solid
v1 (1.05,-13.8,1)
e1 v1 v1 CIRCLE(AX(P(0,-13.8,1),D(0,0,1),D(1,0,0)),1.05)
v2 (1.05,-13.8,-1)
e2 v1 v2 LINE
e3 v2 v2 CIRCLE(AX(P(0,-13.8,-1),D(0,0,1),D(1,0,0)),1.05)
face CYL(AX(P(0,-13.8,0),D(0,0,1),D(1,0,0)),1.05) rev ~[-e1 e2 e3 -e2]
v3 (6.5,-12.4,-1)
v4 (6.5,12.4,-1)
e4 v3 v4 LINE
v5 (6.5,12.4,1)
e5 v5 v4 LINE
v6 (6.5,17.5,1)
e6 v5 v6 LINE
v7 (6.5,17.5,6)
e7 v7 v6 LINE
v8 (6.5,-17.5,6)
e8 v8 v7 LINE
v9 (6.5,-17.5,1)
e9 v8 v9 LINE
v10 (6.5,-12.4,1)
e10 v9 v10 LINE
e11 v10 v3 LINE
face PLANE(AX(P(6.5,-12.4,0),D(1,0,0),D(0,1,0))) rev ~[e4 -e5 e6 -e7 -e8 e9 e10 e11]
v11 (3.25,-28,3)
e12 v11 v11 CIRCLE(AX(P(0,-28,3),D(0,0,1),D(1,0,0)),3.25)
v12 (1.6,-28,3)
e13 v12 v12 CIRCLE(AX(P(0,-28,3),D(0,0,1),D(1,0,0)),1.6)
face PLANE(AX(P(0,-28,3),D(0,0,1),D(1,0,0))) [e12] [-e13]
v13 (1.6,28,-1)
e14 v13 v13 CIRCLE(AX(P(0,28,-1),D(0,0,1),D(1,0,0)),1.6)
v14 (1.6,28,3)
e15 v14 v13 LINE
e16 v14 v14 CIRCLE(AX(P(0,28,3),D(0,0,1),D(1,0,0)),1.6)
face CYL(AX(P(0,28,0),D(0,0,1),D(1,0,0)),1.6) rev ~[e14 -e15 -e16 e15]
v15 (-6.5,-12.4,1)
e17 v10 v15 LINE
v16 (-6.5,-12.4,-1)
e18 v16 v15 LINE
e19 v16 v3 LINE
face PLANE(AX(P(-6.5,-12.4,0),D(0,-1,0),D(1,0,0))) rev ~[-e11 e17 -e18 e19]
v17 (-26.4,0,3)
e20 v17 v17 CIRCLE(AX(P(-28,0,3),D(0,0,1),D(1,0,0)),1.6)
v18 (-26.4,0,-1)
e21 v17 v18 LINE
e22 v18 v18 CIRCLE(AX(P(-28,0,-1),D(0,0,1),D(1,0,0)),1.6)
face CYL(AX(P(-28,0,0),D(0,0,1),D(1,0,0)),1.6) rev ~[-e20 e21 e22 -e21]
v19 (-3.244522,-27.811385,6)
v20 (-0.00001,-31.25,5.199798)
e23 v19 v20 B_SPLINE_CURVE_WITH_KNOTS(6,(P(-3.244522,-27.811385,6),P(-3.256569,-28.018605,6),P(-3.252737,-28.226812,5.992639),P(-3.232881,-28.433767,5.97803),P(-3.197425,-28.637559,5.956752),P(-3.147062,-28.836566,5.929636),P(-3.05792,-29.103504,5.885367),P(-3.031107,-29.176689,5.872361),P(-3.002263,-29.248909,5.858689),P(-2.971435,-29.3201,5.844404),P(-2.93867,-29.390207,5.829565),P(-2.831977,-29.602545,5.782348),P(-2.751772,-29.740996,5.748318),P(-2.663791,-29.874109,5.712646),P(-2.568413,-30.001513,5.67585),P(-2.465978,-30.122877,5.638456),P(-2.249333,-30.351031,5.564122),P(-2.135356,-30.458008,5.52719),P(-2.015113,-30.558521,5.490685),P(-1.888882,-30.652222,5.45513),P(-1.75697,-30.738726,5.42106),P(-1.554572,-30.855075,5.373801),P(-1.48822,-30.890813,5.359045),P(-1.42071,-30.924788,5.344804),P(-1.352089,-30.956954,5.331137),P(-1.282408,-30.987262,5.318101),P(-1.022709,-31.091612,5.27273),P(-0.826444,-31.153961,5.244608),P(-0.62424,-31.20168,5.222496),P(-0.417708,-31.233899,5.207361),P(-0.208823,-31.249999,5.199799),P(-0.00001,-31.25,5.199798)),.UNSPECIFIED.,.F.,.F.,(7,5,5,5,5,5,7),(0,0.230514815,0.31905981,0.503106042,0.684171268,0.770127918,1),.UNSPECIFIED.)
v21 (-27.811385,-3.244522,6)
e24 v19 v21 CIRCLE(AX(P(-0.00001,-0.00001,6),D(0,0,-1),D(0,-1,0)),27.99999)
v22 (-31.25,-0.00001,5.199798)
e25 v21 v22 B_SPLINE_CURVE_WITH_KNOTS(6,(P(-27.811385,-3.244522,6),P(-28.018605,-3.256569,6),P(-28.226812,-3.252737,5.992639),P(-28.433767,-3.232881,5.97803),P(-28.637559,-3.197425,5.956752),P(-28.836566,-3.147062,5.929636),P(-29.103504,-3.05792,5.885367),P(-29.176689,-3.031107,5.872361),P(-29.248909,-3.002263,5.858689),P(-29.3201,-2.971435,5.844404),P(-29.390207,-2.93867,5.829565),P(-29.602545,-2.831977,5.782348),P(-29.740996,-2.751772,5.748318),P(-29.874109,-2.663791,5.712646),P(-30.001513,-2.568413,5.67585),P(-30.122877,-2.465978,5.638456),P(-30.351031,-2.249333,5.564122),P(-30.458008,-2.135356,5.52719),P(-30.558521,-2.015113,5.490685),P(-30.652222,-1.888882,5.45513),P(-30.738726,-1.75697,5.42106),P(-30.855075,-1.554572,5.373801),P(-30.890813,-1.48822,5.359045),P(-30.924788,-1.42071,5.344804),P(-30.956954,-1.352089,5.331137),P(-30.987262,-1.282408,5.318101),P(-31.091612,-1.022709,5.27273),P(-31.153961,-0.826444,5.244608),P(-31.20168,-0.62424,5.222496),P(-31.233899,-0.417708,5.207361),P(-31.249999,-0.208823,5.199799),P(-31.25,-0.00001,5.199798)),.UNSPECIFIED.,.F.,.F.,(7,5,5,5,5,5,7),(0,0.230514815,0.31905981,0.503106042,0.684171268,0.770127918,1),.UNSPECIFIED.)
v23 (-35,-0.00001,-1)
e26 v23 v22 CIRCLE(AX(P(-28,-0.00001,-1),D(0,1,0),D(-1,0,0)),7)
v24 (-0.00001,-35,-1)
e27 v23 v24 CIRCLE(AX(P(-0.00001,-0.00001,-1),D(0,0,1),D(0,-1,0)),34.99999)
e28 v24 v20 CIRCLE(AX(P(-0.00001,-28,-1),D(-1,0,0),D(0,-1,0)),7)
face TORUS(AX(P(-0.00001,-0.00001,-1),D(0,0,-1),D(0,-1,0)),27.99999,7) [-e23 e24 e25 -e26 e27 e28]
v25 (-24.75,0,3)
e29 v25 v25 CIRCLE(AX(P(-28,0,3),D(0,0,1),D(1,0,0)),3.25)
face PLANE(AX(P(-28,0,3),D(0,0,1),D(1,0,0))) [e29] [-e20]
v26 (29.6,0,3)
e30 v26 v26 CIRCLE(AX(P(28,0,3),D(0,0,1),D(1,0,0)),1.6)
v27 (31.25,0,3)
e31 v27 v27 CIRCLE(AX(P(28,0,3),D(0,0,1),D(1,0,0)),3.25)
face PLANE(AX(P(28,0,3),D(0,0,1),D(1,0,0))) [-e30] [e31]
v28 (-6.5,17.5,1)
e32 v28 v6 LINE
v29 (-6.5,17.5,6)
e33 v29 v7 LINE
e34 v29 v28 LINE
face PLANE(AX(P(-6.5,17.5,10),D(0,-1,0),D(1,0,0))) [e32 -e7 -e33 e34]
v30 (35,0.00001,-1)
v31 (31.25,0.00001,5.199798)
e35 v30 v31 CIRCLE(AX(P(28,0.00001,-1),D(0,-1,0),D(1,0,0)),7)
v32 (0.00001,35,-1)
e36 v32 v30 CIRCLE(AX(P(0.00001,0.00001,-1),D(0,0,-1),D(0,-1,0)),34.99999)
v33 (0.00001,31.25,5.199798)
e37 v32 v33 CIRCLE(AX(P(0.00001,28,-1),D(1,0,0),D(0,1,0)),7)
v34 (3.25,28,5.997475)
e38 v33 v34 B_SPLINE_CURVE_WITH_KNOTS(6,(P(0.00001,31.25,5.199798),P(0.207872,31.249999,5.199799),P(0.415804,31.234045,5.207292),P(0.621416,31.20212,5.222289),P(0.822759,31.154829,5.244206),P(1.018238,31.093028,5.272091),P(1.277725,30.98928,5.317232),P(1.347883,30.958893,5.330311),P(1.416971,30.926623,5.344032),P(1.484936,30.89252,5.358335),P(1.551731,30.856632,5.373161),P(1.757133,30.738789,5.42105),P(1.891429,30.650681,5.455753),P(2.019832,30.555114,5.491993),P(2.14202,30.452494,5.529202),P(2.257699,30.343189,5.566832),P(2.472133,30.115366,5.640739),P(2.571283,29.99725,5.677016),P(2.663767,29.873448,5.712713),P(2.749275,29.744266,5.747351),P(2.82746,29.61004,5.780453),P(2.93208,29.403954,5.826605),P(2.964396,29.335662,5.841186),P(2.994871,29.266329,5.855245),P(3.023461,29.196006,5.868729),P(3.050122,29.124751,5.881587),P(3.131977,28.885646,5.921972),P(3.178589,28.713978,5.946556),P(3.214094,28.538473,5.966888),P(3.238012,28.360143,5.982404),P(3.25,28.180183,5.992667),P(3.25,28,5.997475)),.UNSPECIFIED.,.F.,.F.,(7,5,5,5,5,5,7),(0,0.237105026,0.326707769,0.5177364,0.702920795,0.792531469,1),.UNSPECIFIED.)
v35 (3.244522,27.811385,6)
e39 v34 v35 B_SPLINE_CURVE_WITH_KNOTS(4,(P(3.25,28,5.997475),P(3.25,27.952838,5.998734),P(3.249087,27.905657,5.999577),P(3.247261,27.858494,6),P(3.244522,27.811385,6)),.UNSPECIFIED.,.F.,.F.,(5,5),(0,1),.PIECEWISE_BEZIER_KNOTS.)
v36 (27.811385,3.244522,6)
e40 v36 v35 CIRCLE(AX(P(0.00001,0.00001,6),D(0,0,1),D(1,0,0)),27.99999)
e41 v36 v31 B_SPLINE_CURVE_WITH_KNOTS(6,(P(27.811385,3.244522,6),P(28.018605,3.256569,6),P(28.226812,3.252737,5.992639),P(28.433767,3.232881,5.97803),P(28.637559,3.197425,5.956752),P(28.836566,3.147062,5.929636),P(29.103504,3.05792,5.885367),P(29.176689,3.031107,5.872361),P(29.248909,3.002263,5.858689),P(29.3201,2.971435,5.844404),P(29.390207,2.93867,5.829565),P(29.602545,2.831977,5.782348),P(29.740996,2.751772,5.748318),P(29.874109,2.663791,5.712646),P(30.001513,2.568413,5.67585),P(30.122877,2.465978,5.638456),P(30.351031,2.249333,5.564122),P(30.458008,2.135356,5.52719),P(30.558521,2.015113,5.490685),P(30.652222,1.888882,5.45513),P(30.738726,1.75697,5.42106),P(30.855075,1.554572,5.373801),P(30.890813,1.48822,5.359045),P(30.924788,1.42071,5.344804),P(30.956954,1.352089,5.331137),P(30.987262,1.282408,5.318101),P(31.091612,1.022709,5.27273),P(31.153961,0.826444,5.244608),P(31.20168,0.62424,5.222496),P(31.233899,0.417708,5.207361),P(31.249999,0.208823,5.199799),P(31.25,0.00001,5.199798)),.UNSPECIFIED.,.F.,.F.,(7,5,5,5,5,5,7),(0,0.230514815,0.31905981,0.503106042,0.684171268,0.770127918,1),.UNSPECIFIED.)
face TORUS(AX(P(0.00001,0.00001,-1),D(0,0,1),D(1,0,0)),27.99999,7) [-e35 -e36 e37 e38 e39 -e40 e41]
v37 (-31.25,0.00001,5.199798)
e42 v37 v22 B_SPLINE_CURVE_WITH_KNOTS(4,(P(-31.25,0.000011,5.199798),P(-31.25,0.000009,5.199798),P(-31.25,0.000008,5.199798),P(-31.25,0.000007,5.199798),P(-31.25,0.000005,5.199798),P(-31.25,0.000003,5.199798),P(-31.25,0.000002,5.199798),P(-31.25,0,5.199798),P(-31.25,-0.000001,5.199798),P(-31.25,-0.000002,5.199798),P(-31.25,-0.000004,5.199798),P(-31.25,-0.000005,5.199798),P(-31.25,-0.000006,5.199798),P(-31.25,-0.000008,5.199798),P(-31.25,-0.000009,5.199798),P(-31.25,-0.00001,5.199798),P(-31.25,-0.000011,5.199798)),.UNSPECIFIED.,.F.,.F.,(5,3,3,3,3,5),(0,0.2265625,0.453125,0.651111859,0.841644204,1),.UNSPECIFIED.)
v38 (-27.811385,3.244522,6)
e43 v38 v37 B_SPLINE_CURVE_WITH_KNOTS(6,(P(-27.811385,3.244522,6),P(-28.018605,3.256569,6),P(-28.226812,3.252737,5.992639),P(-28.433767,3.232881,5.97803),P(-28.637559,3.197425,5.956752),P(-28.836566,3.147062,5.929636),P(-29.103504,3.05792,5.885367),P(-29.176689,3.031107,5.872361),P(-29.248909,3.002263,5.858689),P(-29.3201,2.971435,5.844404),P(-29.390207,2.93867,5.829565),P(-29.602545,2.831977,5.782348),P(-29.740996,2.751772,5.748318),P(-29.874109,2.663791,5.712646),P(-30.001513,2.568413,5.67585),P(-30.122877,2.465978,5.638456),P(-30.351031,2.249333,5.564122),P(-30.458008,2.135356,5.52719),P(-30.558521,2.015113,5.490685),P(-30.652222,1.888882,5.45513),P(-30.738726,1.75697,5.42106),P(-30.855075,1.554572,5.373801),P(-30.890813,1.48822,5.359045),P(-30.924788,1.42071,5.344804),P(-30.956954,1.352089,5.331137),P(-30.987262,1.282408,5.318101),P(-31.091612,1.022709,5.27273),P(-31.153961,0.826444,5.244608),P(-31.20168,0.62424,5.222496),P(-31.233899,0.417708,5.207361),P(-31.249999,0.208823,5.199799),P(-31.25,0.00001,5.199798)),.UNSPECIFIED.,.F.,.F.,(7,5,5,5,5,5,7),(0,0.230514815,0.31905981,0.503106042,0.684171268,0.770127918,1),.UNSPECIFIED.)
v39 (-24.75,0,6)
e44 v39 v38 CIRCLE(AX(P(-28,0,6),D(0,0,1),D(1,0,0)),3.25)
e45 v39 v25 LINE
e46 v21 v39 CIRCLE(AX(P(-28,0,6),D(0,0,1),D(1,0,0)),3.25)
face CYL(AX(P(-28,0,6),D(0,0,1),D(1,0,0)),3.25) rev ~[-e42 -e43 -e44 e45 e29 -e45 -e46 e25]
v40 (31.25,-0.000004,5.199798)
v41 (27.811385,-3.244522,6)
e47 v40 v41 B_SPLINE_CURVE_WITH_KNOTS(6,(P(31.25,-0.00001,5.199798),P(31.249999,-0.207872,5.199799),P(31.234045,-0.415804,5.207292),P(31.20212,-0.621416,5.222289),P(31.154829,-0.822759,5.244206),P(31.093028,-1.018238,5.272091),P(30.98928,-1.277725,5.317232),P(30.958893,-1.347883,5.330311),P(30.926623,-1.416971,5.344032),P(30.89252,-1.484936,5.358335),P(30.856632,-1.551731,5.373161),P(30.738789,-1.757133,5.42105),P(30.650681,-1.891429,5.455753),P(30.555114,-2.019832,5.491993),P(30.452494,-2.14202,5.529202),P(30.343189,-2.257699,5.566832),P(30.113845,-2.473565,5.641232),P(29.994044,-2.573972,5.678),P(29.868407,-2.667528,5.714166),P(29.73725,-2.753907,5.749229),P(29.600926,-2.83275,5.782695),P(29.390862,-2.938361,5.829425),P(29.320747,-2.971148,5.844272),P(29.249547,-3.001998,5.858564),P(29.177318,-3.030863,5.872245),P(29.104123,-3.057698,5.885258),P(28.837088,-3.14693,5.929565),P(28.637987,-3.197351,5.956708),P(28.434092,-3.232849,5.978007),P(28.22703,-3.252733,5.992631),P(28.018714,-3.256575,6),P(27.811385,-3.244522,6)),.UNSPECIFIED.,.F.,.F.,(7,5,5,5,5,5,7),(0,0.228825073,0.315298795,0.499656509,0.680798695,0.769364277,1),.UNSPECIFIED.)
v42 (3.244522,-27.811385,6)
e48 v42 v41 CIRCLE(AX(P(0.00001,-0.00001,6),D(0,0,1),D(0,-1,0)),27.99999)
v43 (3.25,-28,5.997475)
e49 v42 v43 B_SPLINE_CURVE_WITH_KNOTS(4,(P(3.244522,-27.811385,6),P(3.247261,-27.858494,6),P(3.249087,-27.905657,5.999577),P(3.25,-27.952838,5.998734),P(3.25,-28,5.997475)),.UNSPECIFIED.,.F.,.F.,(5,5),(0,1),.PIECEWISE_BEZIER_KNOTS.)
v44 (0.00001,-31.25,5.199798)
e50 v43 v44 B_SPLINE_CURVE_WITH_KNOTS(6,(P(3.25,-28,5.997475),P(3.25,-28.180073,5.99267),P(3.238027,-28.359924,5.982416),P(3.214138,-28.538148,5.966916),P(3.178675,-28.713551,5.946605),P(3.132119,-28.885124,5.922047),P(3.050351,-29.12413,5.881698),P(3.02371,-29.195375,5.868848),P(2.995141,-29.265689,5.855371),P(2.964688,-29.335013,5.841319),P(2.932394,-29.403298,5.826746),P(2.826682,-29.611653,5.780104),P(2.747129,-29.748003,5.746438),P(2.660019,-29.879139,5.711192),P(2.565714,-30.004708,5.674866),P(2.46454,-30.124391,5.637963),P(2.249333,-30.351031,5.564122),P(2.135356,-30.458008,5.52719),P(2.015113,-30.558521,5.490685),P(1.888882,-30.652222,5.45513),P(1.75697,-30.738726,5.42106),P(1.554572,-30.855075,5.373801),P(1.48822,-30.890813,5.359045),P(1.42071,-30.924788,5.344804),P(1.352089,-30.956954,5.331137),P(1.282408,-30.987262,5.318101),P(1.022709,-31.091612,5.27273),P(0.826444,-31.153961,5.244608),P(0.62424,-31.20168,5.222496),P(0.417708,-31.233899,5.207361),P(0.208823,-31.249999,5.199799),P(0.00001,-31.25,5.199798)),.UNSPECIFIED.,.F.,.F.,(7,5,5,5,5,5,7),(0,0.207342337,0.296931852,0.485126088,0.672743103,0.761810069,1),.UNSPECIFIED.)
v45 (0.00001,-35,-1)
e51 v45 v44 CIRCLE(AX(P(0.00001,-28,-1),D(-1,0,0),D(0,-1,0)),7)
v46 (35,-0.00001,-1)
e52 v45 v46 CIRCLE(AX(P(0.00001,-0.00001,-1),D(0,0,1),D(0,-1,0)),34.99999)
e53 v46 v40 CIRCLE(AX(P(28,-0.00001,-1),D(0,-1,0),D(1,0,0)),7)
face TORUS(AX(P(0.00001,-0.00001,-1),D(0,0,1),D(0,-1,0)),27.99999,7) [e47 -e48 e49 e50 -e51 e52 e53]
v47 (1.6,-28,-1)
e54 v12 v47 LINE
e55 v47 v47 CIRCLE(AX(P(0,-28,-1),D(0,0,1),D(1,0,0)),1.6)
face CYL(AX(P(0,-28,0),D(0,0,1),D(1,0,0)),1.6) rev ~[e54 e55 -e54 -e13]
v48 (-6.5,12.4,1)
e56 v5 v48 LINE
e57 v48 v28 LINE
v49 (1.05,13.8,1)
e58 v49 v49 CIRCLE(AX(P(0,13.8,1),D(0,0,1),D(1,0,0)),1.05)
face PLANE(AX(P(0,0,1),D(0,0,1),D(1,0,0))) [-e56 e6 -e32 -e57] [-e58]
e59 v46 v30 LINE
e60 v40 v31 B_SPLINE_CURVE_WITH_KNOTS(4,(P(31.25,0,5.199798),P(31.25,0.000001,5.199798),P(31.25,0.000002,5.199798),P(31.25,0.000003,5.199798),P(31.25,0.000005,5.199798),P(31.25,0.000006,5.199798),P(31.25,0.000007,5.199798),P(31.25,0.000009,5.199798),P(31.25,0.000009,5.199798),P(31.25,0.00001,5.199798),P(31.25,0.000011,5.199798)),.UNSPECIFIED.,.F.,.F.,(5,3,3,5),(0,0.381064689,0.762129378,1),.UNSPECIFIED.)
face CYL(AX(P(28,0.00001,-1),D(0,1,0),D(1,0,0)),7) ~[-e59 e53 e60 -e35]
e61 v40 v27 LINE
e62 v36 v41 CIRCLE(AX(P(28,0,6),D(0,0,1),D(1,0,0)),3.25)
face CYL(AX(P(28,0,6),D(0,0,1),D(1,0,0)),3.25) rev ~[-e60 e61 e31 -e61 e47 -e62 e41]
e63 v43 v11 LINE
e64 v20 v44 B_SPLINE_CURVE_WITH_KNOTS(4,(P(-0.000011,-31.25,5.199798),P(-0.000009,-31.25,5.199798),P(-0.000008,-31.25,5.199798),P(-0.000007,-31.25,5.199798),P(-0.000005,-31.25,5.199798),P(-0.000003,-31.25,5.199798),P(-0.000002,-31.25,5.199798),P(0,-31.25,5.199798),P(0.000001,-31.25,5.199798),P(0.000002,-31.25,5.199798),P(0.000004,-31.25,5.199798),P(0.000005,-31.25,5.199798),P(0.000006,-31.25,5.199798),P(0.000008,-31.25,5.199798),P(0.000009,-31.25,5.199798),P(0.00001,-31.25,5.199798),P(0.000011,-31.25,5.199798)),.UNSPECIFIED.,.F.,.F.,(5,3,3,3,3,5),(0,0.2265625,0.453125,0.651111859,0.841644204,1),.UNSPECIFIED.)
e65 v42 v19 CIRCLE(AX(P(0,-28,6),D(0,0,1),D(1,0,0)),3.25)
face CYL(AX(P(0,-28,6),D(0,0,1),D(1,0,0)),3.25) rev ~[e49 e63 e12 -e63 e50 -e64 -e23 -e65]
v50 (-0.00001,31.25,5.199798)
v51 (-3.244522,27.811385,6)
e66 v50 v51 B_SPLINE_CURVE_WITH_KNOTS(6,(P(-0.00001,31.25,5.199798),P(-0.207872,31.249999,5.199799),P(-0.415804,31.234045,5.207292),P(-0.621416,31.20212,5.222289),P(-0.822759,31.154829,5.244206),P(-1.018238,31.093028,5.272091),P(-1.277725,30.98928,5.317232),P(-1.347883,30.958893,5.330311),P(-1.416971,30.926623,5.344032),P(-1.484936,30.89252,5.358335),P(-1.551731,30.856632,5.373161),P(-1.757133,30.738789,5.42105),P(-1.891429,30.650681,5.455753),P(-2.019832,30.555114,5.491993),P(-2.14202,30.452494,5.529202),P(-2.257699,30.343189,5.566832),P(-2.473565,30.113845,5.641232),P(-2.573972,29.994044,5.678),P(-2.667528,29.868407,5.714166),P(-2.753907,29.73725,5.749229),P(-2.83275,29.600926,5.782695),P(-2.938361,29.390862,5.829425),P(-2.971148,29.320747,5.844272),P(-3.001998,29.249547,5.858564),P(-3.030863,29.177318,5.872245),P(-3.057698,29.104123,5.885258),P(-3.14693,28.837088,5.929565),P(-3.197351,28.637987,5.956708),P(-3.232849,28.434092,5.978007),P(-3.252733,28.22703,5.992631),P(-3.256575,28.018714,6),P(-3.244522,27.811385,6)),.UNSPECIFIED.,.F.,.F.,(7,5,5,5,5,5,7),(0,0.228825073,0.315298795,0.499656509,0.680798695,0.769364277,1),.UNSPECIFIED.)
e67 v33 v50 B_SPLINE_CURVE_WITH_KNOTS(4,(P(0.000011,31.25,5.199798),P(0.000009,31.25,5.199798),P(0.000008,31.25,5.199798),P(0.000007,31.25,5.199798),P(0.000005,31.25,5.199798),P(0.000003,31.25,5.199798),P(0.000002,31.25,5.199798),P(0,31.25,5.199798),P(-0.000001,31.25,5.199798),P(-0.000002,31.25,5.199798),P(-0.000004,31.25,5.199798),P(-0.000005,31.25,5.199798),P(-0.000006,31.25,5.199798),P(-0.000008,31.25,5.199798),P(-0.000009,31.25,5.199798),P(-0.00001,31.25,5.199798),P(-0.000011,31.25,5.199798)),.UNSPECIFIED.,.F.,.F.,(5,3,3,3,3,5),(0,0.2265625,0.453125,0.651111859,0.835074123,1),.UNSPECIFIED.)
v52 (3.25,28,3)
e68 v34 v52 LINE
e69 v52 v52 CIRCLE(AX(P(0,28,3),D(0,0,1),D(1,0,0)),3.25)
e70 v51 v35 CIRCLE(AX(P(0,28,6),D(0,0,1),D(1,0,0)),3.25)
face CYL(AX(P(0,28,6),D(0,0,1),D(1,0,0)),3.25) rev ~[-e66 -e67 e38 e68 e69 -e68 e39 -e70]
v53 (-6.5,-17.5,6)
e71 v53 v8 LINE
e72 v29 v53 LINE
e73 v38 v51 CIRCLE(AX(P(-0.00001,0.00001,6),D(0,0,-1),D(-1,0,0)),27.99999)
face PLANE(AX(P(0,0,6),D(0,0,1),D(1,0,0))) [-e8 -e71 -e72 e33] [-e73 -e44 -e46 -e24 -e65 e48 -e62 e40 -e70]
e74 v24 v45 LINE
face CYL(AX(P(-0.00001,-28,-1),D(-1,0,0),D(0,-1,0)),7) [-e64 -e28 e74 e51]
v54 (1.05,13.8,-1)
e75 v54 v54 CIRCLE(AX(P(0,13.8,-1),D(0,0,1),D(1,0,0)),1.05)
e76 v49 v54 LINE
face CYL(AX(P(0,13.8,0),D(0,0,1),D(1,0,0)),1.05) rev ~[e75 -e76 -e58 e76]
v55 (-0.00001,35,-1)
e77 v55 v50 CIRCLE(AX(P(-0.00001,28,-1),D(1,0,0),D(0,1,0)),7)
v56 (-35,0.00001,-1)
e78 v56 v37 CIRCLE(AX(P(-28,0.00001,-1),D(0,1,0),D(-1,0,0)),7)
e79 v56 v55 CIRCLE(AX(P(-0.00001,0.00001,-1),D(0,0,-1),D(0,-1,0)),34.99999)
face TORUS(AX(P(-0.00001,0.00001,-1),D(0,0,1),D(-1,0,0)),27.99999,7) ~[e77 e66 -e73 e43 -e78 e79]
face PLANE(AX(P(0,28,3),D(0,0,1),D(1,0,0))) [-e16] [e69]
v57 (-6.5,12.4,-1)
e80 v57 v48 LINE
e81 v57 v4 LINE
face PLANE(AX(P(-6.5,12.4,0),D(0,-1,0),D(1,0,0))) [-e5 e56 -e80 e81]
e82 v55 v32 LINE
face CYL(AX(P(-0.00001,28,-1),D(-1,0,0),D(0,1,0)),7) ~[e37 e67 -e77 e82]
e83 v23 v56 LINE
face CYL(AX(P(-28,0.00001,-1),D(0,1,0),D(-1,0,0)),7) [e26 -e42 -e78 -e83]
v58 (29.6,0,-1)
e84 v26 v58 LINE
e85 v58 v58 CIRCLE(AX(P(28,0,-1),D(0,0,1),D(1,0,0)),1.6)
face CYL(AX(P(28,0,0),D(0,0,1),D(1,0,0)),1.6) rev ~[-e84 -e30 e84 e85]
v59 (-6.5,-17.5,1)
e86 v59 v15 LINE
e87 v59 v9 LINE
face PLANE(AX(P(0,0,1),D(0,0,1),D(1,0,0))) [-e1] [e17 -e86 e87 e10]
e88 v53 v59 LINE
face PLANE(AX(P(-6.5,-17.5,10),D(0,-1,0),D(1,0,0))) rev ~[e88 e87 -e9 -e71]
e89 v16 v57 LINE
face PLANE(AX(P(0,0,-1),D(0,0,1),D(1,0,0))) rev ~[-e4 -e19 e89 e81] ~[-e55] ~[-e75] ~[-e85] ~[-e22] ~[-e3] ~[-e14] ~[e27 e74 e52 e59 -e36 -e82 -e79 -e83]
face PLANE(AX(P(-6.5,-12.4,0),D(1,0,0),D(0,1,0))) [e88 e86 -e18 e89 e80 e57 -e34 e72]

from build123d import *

# Parameters (mm, degrees)
F0_W          = 70
F0_H          = 70
F1_DEPTH      = 10
F2_W          = 13
F2_H          = 24.8
F3_DEPTH      = 25
F4_W          = 70
F4_H          = 70
F4_W_2        = 40
F4_H_2        = 40
F5_DEPTH      = 4
F6_W          = 13
F6_H          = 35
F7_DEPTH      = 9
F8_R          = 1.05
F9_DEPTH      = 25
F10_R         = 1.6
F11_DEPTH     = 25
F12_R         = 3.25
F13_DEPTH     = 3
F14_DEPTH     = 4
F15_R         = 34.99999
F16_DEPTH     = 1
F17_T1_DEPTH  = 2e-05
F17_T3_DEPTH  = 2e-05
F17_T6_ANGLE  = 90
F17_T8_ANGLE  = 90
F17_T10_ANGLE = 90
F17_T12_ANGLE = 90


# Not quite as in the source:
# - a fillet or chamfer that OpenCascade refuses, or shapes differently, is made with other operations: its cross-section is extruded or revolved along the edge and cut away or added
# - a fillet or chamfer is up to 0.001 mm smaller than in the source, because OpenCascade refuses the exact size


with BuildPart() as f1:
    # F0 (on Top) → F1 (new body)
    with BuildSketch(Plane.XY):
        Rectangle(F0_W, F0_H)
    extrude(amount=F1_DEPTH)

    # F2 (on face) → F3 (cut)
    with BuildSketch(Plane.XY.offset(10)):
        Rectangle(F2_W, F2_H)
    extrude(amount=-F3_DEPTH, mode=Mode.SUBTRACT)

    # F4 (on face) → F5 (cut)
    with BuildSketch(Plane.XY.offset(10)):
        Rectangle(F4_W, F4_H)
        Rectangle(F4_W_2, F4_H_2, mode=Mode.SUBTRACT)
    extrude(amount=-F5_DEPTH, mode=Mode.SUBTRACT)

    # F6 (on face) → F7 (cut)
    with BuildSketch(Plane.XY.offset(10)):
        Rectangle(F6_W, F6_H)
    extrude(amount=-F7_DEPTH, mode=Mode.SUBTRACT)

    # F8 (on face) → F9 (cut)
    with BuildSketch(Plane.XY.offset(1)):
        with Locations((0, 13.8)):
            Circle(F8_R)
        with Locations((0, -13.8)):
            Circle(F8_R)
    extrude(amount=-F9_DEPTH, mode=Mode.SUBTRACT)

    # F10 (on face) → F11 (cut)
    with BuildSketch(Plane.XY.offset(6)):
        with Locations((-28, 0)):
            Circle(F10_R)
        with Locations((28, 0)):
            Circle(F10_R)
        with Locations((0, -28)):
            Circle(F10_R)
        with Locations((0, 28)):
            Circle(F10_R)
    extrude(amount=-F11_DEPTH, mode=Mode.SUBTRACT)

    # F12 (on face) → F13 (cut)
    with BuildSketch(Plane.XY.offset(6)):
        with Locations((-28, 0)):
            Circle(F12_R)
        with Locations((28, 0)):
            Circle(F12_R)
        with Locations((0, -28)):
            Circle(F12_R)
        with Locations((0, 28)):
            Circle(F12_R)
    extrude(amount=-F13_DEPTH, mode=Mode.SUBTRACT)

    # F14 (cut, through all): a face of the model
    f14_faces = [f1.faces().sort_by_distance(p)[0] for p in [
        (-19.4343145751, 0, 10),
    ]]
    extrude(f14_faces, amount=-F14_DEPTH, mode=Mode.SUBTRACT)

    # F15 (radius 35 in the source; OpenCascade refuses exactly that, so slightly less here)
    f15_edges = [f1.edges().sort_by_distance(p)[0] for p in [
        (-35, -35, 3),
        (35, -35, 3),
        (35, 35, 3),
        (-35, 35, 3),
    ]]
    fillet(f15_edges, radius=F15_R)

    # F16 (add): a face of the model
    f16_faces = [f1.faces().sort_by_distance(p)[0] for p in [
        (0, -34.0100505063, 0),
    ]]
    extrude(f16_faces, amount=F16_DEPTH)

    # F17: fillet of radius 7 on 1 edges, made by hand

    # F17_s2 → F17_t1 (cut)
    with BuildSketch(Plane.YZ.offset(-1e-05)):
        with BuildLine():
            ThreePointArc((-35, -1), (-32.9497474683, 3.9497474683), (-28, 6))
            Line((-28, 6), (-35, 6))
            Line((-35, 6), (-35, -1))
        make_face()
        with BuildLine():
            ThreePointArc((35, -1), (32.9497474683, 3.9497474683), (28, 6))
            Line((28, 6), (35, 6))
            Line((35, 6), (35, -1))
        make_face()
    extrude(amount=F17_T1_DEPTH, mode=Mode.SUBTRACT)

    # F17_s4 → F17_t3 (cut)
    with BuildSketch(Plane.XZ.offset(-1e-05)):
        with BuildLine():
            ThreePointArc((35, -1), (32.9497474683, 3.9497474683), (28, 6))
            Line((28, 6), (35, 6))
            Line((35, 6), (35, -1))
        make_face()
        with BuildLine():
            ThreePointArc((-35, -1), (-32.9497474683, 3.9497474683), (-28, 6))
            Line((-28, 6), (-35, 6))
            Line((-35, 6), (-35, -1))
        make_face()
    extrude(amount=F17_T3_DEPTH, mode=Mode.SUBTRACT)

    # F17_s5 → F17_t6 (revolve, cut)
    with BuildSketch(Plane.YZ.offset(1e-05)):
        with BuildLine():
            ThreePointArc((-35, -1), (-32.9497474683, 3.9497474683), (-28, 6))
            Line((-28, 6), (-35, 6))
            Line((-35, 6), (-35, -1))
        make_face()
    revolve(axis=Axis((1e-05, -1e-05, 6), (0, 0, 1)), revolution_arc=F17_T6_ANGLE, mode=Mode.SUBTRACT)

    # F17_s7 → F17_t8 (revolve, cut)
    with BuildSketch(Plane.XZ.offset(-1e-05)):
        with BuildLine():
            ThreePointArc((35, -1), (32.9497474683, 3.9497474683), (28, 6))
            Line((28, 6), (35, 6))
            Line((35, 6), (35, -1))
        make_face()
    revolve(axis=Axis((1e-05, 1e-05, 6), (0, 0, 1)), revolution_arc=F17_T8_ANGLE, mode=Mode.SUBTRACT)

    # F17_s9 → F17_t10 (revolve, cut)
    with BuildSketch(Plane.XZ.offset(-1e-05)):
        with BuildLine():
            ThreePointArc((-35, -1), (-32.9497474683, 3.9497474683), (-28, 6))
            Line((-28, 6), (-35, 6))
            Line((-35, 6), (-35, -1))
        make_face()
    revolve(axis=Axis((-1e-05, 1e-05, 6), (0, 0, -1)), revolution_arc=F17_T10_ANGLE, mode=Mode.SUBTRACT)

    # F17_s11 → F17_t12 (revolve, cut)
    with BuildSketch(Plane.YZ.offset(-1e-05)):
        with BuildLine():
            ThreePointArc((-28, 6), (-32.9497474683, 3.9497474683), (-35, -1))
            Line((-35, -1), (-35, 6))
            Line((-35, 6), (-28, 6))
        make_face()
    revolve(axis=Axis((-1e-05, -1e-05, 6), (0, 0, -1)), revolution_arc=F17_T12_ANGLE, mode=Mode.SUBTRACT)


solid = f1.part
